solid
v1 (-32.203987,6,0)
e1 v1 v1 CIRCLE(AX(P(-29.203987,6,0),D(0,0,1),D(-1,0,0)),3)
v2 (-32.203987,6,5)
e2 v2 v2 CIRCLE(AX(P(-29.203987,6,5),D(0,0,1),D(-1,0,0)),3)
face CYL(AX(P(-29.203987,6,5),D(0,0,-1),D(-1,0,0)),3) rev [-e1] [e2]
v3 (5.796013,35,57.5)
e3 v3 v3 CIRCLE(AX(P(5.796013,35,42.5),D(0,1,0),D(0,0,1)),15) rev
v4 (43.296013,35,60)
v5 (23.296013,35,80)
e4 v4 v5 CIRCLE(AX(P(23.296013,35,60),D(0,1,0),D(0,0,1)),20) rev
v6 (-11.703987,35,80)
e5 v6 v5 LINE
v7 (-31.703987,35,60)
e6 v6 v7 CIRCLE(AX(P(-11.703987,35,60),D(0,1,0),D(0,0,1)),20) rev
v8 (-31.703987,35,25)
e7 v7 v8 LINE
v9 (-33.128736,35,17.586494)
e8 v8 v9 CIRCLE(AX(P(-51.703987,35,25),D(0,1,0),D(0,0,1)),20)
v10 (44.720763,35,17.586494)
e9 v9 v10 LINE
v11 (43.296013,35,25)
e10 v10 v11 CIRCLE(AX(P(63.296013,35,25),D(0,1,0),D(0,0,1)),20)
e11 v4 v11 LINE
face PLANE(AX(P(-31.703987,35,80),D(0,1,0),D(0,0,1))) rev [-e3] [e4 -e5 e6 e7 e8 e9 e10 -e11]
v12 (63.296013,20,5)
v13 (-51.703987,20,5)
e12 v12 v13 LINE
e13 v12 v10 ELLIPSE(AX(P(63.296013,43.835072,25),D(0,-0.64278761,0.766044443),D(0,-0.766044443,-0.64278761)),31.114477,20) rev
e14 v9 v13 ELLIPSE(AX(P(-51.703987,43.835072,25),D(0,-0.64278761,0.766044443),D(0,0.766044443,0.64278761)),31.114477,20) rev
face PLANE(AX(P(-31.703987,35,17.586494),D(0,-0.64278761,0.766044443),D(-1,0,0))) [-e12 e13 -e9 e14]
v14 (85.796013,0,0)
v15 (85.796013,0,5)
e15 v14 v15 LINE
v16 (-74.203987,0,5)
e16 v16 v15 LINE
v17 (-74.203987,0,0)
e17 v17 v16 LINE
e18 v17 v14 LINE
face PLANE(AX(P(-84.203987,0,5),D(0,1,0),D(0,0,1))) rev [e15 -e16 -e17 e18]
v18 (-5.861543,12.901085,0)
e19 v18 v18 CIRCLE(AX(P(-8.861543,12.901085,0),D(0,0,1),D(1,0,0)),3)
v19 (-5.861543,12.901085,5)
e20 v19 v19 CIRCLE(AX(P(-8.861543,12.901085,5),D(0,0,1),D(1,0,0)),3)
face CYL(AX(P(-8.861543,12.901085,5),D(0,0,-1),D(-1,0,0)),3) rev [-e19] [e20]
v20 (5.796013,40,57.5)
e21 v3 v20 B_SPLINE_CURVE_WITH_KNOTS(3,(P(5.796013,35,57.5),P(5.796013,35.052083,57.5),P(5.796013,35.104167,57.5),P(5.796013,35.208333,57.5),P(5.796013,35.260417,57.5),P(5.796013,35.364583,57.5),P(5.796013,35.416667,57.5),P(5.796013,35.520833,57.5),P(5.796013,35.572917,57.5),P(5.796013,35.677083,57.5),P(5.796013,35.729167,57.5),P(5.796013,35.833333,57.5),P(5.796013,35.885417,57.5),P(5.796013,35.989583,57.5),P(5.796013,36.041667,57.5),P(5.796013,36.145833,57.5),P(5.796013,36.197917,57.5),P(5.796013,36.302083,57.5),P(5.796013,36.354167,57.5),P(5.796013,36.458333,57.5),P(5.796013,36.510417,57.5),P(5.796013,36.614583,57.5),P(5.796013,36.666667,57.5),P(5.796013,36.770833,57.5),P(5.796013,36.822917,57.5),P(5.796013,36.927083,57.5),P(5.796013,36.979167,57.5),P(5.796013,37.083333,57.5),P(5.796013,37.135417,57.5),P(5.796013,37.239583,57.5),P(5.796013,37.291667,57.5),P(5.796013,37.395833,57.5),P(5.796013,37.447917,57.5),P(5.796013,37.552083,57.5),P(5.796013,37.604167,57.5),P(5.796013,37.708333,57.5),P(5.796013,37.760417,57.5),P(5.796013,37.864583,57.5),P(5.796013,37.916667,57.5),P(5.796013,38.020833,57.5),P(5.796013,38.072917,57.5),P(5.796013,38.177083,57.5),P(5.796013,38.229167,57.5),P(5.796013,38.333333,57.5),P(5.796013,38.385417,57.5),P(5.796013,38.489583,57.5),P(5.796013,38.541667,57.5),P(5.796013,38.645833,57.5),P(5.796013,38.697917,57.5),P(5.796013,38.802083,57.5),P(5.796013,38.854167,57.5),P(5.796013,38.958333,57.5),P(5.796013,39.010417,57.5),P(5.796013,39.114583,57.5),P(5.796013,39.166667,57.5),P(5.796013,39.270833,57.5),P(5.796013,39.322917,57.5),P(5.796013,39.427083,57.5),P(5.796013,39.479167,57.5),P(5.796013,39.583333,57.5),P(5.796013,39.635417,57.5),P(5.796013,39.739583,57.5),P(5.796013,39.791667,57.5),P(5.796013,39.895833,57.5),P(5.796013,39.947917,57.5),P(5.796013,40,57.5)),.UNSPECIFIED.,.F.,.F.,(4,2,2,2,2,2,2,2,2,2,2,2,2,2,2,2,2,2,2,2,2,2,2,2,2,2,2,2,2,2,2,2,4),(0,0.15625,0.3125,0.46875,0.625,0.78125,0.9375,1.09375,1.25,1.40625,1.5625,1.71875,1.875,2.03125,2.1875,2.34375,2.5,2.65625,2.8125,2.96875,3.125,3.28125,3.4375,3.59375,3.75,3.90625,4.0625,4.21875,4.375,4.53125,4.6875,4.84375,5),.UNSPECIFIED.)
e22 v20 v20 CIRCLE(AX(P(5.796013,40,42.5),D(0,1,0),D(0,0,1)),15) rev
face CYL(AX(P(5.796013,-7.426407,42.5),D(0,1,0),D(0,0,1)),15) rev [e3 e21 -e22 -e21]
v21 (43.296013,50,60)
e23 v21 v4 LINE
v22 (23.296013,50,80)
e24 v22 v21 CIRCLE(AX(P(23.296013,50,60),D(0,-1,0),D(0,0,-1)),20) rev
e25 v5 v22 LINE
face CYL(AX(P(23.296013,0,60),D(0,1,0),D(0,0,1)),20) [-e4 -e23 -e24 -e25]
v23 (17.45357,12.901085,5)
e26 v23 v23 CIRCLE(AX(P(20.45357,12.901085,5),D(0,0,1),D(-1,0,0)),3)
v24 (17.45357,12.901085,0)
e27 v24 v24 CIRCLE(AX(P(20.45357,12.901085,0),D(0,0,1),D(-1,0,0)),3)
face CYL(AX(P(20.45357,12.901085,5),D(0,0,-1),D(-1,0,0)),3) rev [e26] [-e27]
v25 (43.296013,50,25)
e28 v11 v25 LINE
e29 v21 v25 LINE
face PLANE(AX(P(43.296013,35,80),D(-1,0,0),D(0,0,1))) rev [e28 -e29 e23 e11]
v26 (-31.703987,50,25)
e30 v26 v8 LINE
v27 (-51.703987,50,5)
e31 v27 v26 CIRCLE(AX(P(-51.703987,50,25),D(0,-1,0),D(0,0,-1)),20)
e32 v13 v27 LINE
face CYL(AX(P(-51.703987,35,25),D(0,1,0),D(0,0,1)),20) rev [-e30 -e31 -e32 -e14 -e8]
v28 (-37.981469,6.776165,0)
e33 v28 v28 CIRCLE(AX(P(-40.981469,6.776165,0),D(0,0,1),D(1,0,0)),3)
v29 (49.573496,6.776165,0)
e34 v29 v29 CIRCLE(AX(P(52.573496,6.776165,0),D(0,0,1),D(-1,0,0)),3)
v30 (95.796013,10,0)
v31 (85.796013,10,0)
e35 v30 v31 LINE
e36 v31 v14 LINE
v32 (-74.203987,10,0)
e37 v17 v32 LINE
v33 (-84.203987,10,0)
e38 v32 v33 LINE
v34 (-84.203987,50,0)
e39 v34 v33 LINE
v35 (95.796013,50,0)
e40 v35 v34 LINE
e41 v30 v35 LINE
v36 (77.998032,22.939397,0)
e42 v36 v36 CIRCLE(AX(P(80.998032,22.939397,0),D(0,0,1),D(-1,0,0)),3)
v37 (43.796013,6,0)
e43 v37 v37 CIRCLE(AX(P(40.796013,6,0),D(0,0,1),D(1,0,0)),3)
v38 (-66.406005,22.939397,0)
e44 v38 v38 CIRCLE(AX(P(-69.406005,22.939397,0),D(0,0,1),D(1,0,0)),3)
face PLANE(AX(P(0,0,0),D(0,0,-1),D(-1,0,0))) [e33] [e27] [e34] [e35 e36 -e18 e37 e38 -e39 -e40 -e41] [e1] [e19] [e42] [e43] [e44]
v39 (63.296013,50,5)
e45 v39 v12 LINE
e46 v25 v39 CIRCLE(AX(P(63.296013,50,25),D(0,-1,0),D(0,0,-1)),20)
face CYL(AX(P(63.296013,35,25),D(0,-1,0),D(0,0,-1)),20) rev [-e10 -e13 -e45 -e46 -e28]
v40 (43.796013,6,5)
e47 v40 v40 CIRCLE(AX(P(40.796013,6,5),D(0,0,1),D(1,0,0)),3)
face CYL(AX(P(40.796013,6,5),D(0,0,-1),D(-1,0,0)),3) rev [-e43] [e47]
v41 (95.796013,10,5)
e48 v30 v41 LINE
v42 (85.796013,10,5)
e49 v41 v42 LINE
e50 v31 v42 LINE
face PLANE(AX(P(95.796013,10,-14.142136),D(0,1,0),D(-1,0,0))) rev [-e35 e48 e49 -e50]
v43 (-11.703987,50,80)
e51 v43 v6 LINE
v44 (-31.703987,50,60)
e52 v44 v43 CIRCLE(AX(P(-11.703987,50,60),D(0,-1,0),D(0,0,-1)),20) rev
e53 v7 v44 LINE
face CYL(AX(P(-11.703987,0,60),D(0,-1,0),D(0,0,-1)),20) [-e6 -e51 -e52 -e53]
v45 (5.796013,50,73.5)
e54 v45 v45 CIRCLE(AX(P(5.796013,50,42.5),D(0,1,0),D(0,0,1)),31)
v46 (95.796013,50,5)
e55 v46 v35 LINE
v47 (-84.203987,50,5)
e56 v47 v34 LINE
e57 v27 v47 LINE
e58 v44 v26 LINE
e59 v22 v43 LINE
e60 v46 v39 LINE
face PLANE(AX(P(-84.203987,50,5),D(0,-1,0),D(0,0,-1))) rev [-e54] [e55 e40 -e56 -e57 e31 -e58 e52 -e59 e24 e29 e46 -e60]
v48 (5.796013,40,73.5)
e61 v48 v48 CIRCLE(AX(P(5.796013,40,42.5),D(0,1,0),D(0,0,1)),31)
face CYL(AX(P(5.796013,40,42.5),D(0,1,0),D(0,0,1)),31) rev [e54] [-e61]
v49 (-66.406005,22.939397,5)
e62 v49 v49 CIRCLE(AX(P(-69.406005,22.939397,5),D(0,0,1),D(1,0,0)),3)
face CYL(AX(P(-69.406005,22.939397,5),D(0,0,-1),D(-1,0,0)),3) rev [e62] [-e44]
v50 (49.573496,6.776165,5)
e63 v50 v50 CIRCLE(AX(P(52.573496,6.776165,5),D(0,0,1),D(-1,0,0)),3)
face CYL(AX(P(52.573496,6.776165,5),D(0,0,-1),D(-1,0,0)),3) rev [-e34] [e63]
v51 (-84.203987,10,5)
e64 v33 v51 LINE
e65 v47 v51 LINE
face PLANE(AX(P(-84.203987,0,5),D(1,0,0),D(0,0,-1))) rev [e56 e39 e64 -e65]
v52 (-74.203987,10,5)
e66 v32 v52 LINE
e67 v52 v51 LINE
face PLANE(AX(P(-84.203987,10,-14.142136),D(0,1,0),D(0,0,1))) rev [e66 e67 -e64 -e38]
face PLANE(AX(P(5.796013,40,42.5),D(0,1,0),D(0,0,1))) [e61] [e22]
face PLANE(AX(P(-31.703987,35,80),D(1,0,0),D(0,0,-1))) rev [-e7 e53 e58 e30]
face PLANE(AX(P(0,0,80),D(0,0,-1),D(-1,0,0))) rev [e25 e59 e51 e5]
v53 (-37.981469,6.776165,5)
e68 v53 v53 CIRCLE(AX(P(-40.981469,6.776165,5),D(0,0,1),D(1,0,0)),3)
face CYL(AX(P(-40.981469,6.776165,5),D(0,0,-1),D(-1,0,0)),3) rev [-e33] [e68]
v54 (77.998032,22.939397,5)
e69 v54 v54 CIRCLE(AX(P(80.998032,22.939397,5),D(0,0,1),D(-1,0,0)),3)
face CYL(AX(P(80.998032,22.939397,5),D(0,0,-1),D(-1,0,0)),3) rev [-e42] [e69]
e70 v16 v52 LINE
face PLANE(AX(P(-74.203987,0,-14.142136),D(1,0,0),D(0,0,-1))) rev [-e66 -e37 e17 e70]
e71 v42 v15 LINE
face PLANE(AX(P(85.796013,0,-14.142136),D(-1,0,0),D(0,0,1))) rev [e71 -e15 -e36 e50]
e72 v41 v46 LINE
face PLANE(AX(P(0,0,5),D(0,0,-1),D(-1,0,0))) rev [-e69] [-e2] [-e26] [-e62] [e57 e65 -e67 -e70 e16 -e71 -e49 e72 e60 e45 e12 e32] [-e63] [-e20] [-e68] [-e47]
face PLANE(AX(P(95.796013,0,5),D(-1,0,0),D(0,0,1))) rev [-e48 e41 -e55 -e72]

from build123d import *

# Parameters (mm, degrees)
ESQUISSE1_W             = 180
ESQUISSE1_H             = 50
ESQUISSE1_R             = 3
BOSS_EXTRU_1_DEPTH      = 5
ESQUISSE2_W             = 75
ESQUISSE2_H             = 15
BOSS_EXTRU_2_DEPTH      = 75
ESQUISSE3_R             = 15
ENL_V_MAT_EXTRU_1_DEPTH = 15
ESQUISSE4_R             = 31
ENL_V_MAT_EXTRU_2_DEPTH = 10
CONG_1_R                = 20
CHANFREIN1_SIZE         = 15
CHANFREIN1_SIZE2        = 12.586494468
CONG_2_R                = 20
ESQUISSE5_W             = 10
ESQUISSE5_H             = 10
ENL_V_MAT_EXTRU_3_DEPTH = 5


with BuildPart() as part:
    # Esquisse1 → Boss.-Extru.1 (new body)
    with BuildSketch(Plane.XY):
        with Locations((5.796013405, 25)):
            Rectangle(ESQUISSE1_W, ESQUISSE1_H)
        with Locations((40.796013405, 6)):
            Circle(ESQUISSE1_R, mode=Mode.SUBTRACT)
        with Locations((-69.406004871, 22.939397164)):
            Circle(ESQUISSE1_R, mode=Mode.SUBTRACT)
        with Locations((-40.981469067, 6.77616521)):
            Circle(ESQUISSE1_R, mode=Mode.SUBTRACT)
        with Locations((-8.861542866, 12.901085106)):
            Circle(ESQUISSE1_R, mode=Mode.SUBTRACT)
        with Locations(Location((-29.203986595, 6, 0), (0, 0, 180))):
            Circle(ESQUISSE1_R, mode=Mode.SUBTRACT)
        with Locations(Location((80.99803168, 22.939397164, 0), (0, 0, 180))):
            Circle(ESQUISSE1_R, mode=Mode.SUBTRACT)
        with Locations(Location((52.573495876, 6.77616521, 0), (0, 0, 180))):
            Circle(ESQUISSE1_R, mode=Mode.SUBTRACT)
        with Locations(Location((20.453569676, 12.901085106, 0), (0, 0, 180))):
            Circle(ESQUISSE1_R, mode=Mode.SUBTRACT)
    extrude(amount=BOSS_EXTRU_1_DEPTH)

    # Esquisse2 → Boss.-Extru.2 (add)
    with BuildSketch(Plane.XY.offset(5)):
        with Locations((5.796013405, 42.5)):
            Rectangle(ESQUISSE2_W, ESQUISSE2_H)
    extrude(amount=BOSS_EXTRU_2_DEPTH)

    # Esquisse3 → Enlèv. mat.-Extru.1 (cut)
    with BuildSketch(Plane(origin=(0, 50, 0), x_dir=(1, 0, 0), z_dir=(0, 1, 0))):
        with Locations(Location((5.796013405, -42.5, 0), (0, 0, 270))):
            Circle(ESQUISSE3_R)
    extrude(amount=-ENL_V_MAT_EXTRU_1_DEPTH, mode=Mode.SUBTRACT)

    # Esquisse4 → Enlèv. mat.-Extru.2 (cut)
    with BuildSketch(Plane(origin=(0, 50, 0), x_dir=(1, 0, 0), z_dir=(0, 1, 0))):
        with Locations(Location((5.796013405, -42.5, 0), (0, 0, 270))):
            Circle(ESQUISSE4_R)
    extrude(amount=-ENL_V_MAT_EXTRU_2_DEPTH, mode=Mode.SUBTRACT)

    # Congé1
    cong_1_edges = [part.edges().sort_by_distance(p)[0] for p in [
        (43.296013405, 42.5, 80),
        (-31.703986595, 42.5, 80),
    ]]
    fillet(cong_1_edges, radius=CONG_1_R)

    # Chanfrein1
    chanfrein1_edges = [part.edges().sort_by_distance(p)[0] for p in [
        (5.796013405, 35, 5),
    ]]
    chanfrein1_side = [part.faces().sort_by_distance(p)[0] for p in [
        (5.796013405, 22.805952806, 5),
    ]]
    chamfer(chanfrein1_edges, length=CHANFREIN1_SIZE, length2=CHANFREIN1_SIZE2, reference=chanfrein1_side[0])

    # Congé2
    # the kernel refuses this fillet: 20 mm, written as the material it adds along each edge
    with BuildSketch(Plane(origin=(-31.703986595, -30, 5), x_dir=(0, 0, 1), z_dir=(0, 1, 0))) as cong_2_piece_1_section:
        with BuildLine():
            CenterArc((CONG_2_R, -CONG_2_R), CONG_2_R, 90, 90)
            Line((0, -CONG_2_R), (0, 0))
            Line((0, 0), (CONG_2_R, 0))
        make_face()
    cong_2_piece_1 = extrude(amount=80, mode=Mode.PRIVATE)
    cong_2_piece_1 = split(cong_2_piece_1, bisect_by=Plane(origin=(-37.472324852, 26.525505275, 10.475549069), z_dir=(0, 0.6427876096865406, -0.766044443118977)), keep=Keep.TOP, mode=Mode.PRIVATE)
    cong_2_piece_1 = split(cong_2_piece_1, bisect_by=Plane(origin=(-37.472324852, 35, 7.522714945), z_dir=(0, -1, 0)), keep=Keep.TOP, mode=Mode.PRIVATE)
    add(cong_2_piece_1)
    with BuildSketch(Plane(origin=(-31.703986595, -30, 5), x_dir=(0, 0, 1), z_dir=(0, 1, 0))) as cong_2_piece_2_section:
        with BuildLine():
            CenterArc((CONG_2_R, -CONG_2_R), CONG_2_R, 90, 90)
            Line((0, -CONG_2_R), (0, 0))
            Line((0, 0), (CONG_2_R, 0))
        make_face()
    cong_2_piece_2 = extrude(amount=80, mode=Mode.PRIVATE)
    cong_2_piece_2 = split(cong_2_piece_2, bisect_by=Plane(origin=(-31.680860217, 38.546515029, 20.562373921), z_dir=(0, -0.6427876096865406, 0.766044443118977)), keep=Keep.TOP, mode=Mode.PRIVATE)
    cong_2_piece_2 = split(cong_2_piece_2, bisect_by=Plane(origin=(-31.680860217, 35, 21.798113742), z_dir=(0, 1, 0)), keep=Keep.TOP, mode=Mode.PRIVATE)
    add(cong_2_piece_2)
    with BuildSketch(Plane(origin=(-31.703986595, -30, 5), x_dir=(0, 0, 1), z_dir=(0, 1, 0))) as cong_2_piece_3_section:
        with BuildLine():
            CenterArc((CONG_2_R, -CONG_2_R), CONG_2_R, 90, 90)
            Line((0, -CONG_2_R), (0, 0))
            Line((0, 0), (CONG_2_R, 0))
        make_face()
    cong_2_piece_3 = extrude(amount=80, mode=Mode.PRIVATE)
    cong_2_piece_3 = split(cong_2_piece_3, bisect_by=Plane(origin=(-36.294325359, 35.39038505, 17.914066419), z_dir=(0, 0.6427876096865406, -0.766044443118977)), keep=Keep.TOP, mode=Mode.PRIVATE)
    cong_2_piece_3 = split(cong_2_piece_3, bisect_by=Plane(origin=(-36.294325359, 35, 9.359564784), z_dir=(0, 1, 0)), keep=Keep.TOP, mode=Mode.PRIVATE)
    add(cong_2_piece_3)
    with BuildSketch(Plane(origin=(43.296013405, -30, 5), x_dir=(0, 0, 1), z_dir=(0, 1, 0))) as cong_2_piece_4_section:
        with BuildLine():
            CenterArc((CONG_2_R, CONG_2_R), CONG_2_R, 180, 90)
            Line((0, CONG_2_R), (0, 0))
            Line((0, 0), (CONG_2_R, 0))
        make_face()
    cong_2_piece_4 = extrude(amount=80, mode=Mode.PRIVATE)
    cong_2_piece_4 = split(cong_2_piece_4, bisect_by=Plane(origin=(49.064351662, 35, 7.522714945), z_dir=(0, -1, 0)), keep=Keep.TOP, mode=Mode.PRIVATE)
    cong_2_piece_4 = split(cong_2_piece_4, bisect_by=Plane(origin=(49.064351662, 26.525505275, 10.475549069), z_dir=(0, 0.6427876096865406, -0.766044443118977)), keep=Keep.TOP, mode=Mode.PRIVATE)
    add(cong_2_piece_4)
    with BuildSketch(Plane(origin=(43.296013405, -30, 5), x_dir=(0, 0, 1), z_dir=(0, 1, 0))) as cong_2_piece_5_section:
        with BuildLine():
            CenterArc((CONG_2_R, CONG_2_R), CONG_2_R, 180, 90)
            Line((0, CONG_2_R), (0, 0))
            Line((0, 0), (CONG_2_R, 0))
        make_face()
    cong_2_piece_5 = extrude(amount=80, mode=Mode.PRIVATE)
    cong_2_piece_5 = split(cong_2_piece_5, bisect_by=Plane(origin=(43.272887026, 35, 21.798113742), z_dir=(0, 1, 0)), keep=Keep.TOP, mode=Mode.PRIVATE)
    cong_2_piece_5 = split(cong_2_piece_5, bisect_by=Plane(origin=(43.272887026, 38.546515029, 20.562373921), z_dir=(0, -0.6427876096865406, 0.766044443118977)), keep=Keep.TOP, mode=Mode.PRIVATE)
    add(cong_2_piece_5)
    with BuildSketch(Plane(origin=(43.296013405, -30, 5), x_dir=(0, 0, 1), z_dir=(0, 1, 0))) as cong_2_piece_6_section:
        with BuildLine():
            CenterArc((CONG_2_R, CONG_2_R), CONG_2_R, 180, 90)
            Line((0, CONG_2_R), (0, 0))
            Line((0, 0), (CONG_2_R, 0))
        make_face()
    cong_2_piece_6 = extrude(amount=80, mode=Mode.PRIVATE)
    cong_2_piece_6 = split(cong_2_piece_6, bisect_by=Plane(origin=(47.886352168, 35, 9.359564784), z_dir=(0, 1, 0)), keep=Keep.TOP, mode=Mode.PRIVATE)
    cong_2_piece_6 = split(cong_2_piece_6, bisect_by=Plane(origin=(47.886352168, 35.39038505, 17.914066419), z_dir=(0, 0.6427876096865406, -0.766044443118977)), keep=Keep.TOP, mode=Mode.PRIVATE)
    add(cong_2_piece_6)

    # Esquisse5 → Enlèv. mat.-Extru.3 (cut)
    with BuildSketch(Plane.XY.offset(5)):
        with Locations((-79.203986595, 5)):
            Rectangle(ESQUISSE5_W, ESQUISSE5_H)
        with Locations((90.796013405, 5)):
            Rectangle(ESQUISSE5_W, ESQUISSE5_H)
    extrude(amount=-ENL_V_MAT_EXTRU_3_DEPTH, mode=Mode.SUBTRACT)


solid = part.part
